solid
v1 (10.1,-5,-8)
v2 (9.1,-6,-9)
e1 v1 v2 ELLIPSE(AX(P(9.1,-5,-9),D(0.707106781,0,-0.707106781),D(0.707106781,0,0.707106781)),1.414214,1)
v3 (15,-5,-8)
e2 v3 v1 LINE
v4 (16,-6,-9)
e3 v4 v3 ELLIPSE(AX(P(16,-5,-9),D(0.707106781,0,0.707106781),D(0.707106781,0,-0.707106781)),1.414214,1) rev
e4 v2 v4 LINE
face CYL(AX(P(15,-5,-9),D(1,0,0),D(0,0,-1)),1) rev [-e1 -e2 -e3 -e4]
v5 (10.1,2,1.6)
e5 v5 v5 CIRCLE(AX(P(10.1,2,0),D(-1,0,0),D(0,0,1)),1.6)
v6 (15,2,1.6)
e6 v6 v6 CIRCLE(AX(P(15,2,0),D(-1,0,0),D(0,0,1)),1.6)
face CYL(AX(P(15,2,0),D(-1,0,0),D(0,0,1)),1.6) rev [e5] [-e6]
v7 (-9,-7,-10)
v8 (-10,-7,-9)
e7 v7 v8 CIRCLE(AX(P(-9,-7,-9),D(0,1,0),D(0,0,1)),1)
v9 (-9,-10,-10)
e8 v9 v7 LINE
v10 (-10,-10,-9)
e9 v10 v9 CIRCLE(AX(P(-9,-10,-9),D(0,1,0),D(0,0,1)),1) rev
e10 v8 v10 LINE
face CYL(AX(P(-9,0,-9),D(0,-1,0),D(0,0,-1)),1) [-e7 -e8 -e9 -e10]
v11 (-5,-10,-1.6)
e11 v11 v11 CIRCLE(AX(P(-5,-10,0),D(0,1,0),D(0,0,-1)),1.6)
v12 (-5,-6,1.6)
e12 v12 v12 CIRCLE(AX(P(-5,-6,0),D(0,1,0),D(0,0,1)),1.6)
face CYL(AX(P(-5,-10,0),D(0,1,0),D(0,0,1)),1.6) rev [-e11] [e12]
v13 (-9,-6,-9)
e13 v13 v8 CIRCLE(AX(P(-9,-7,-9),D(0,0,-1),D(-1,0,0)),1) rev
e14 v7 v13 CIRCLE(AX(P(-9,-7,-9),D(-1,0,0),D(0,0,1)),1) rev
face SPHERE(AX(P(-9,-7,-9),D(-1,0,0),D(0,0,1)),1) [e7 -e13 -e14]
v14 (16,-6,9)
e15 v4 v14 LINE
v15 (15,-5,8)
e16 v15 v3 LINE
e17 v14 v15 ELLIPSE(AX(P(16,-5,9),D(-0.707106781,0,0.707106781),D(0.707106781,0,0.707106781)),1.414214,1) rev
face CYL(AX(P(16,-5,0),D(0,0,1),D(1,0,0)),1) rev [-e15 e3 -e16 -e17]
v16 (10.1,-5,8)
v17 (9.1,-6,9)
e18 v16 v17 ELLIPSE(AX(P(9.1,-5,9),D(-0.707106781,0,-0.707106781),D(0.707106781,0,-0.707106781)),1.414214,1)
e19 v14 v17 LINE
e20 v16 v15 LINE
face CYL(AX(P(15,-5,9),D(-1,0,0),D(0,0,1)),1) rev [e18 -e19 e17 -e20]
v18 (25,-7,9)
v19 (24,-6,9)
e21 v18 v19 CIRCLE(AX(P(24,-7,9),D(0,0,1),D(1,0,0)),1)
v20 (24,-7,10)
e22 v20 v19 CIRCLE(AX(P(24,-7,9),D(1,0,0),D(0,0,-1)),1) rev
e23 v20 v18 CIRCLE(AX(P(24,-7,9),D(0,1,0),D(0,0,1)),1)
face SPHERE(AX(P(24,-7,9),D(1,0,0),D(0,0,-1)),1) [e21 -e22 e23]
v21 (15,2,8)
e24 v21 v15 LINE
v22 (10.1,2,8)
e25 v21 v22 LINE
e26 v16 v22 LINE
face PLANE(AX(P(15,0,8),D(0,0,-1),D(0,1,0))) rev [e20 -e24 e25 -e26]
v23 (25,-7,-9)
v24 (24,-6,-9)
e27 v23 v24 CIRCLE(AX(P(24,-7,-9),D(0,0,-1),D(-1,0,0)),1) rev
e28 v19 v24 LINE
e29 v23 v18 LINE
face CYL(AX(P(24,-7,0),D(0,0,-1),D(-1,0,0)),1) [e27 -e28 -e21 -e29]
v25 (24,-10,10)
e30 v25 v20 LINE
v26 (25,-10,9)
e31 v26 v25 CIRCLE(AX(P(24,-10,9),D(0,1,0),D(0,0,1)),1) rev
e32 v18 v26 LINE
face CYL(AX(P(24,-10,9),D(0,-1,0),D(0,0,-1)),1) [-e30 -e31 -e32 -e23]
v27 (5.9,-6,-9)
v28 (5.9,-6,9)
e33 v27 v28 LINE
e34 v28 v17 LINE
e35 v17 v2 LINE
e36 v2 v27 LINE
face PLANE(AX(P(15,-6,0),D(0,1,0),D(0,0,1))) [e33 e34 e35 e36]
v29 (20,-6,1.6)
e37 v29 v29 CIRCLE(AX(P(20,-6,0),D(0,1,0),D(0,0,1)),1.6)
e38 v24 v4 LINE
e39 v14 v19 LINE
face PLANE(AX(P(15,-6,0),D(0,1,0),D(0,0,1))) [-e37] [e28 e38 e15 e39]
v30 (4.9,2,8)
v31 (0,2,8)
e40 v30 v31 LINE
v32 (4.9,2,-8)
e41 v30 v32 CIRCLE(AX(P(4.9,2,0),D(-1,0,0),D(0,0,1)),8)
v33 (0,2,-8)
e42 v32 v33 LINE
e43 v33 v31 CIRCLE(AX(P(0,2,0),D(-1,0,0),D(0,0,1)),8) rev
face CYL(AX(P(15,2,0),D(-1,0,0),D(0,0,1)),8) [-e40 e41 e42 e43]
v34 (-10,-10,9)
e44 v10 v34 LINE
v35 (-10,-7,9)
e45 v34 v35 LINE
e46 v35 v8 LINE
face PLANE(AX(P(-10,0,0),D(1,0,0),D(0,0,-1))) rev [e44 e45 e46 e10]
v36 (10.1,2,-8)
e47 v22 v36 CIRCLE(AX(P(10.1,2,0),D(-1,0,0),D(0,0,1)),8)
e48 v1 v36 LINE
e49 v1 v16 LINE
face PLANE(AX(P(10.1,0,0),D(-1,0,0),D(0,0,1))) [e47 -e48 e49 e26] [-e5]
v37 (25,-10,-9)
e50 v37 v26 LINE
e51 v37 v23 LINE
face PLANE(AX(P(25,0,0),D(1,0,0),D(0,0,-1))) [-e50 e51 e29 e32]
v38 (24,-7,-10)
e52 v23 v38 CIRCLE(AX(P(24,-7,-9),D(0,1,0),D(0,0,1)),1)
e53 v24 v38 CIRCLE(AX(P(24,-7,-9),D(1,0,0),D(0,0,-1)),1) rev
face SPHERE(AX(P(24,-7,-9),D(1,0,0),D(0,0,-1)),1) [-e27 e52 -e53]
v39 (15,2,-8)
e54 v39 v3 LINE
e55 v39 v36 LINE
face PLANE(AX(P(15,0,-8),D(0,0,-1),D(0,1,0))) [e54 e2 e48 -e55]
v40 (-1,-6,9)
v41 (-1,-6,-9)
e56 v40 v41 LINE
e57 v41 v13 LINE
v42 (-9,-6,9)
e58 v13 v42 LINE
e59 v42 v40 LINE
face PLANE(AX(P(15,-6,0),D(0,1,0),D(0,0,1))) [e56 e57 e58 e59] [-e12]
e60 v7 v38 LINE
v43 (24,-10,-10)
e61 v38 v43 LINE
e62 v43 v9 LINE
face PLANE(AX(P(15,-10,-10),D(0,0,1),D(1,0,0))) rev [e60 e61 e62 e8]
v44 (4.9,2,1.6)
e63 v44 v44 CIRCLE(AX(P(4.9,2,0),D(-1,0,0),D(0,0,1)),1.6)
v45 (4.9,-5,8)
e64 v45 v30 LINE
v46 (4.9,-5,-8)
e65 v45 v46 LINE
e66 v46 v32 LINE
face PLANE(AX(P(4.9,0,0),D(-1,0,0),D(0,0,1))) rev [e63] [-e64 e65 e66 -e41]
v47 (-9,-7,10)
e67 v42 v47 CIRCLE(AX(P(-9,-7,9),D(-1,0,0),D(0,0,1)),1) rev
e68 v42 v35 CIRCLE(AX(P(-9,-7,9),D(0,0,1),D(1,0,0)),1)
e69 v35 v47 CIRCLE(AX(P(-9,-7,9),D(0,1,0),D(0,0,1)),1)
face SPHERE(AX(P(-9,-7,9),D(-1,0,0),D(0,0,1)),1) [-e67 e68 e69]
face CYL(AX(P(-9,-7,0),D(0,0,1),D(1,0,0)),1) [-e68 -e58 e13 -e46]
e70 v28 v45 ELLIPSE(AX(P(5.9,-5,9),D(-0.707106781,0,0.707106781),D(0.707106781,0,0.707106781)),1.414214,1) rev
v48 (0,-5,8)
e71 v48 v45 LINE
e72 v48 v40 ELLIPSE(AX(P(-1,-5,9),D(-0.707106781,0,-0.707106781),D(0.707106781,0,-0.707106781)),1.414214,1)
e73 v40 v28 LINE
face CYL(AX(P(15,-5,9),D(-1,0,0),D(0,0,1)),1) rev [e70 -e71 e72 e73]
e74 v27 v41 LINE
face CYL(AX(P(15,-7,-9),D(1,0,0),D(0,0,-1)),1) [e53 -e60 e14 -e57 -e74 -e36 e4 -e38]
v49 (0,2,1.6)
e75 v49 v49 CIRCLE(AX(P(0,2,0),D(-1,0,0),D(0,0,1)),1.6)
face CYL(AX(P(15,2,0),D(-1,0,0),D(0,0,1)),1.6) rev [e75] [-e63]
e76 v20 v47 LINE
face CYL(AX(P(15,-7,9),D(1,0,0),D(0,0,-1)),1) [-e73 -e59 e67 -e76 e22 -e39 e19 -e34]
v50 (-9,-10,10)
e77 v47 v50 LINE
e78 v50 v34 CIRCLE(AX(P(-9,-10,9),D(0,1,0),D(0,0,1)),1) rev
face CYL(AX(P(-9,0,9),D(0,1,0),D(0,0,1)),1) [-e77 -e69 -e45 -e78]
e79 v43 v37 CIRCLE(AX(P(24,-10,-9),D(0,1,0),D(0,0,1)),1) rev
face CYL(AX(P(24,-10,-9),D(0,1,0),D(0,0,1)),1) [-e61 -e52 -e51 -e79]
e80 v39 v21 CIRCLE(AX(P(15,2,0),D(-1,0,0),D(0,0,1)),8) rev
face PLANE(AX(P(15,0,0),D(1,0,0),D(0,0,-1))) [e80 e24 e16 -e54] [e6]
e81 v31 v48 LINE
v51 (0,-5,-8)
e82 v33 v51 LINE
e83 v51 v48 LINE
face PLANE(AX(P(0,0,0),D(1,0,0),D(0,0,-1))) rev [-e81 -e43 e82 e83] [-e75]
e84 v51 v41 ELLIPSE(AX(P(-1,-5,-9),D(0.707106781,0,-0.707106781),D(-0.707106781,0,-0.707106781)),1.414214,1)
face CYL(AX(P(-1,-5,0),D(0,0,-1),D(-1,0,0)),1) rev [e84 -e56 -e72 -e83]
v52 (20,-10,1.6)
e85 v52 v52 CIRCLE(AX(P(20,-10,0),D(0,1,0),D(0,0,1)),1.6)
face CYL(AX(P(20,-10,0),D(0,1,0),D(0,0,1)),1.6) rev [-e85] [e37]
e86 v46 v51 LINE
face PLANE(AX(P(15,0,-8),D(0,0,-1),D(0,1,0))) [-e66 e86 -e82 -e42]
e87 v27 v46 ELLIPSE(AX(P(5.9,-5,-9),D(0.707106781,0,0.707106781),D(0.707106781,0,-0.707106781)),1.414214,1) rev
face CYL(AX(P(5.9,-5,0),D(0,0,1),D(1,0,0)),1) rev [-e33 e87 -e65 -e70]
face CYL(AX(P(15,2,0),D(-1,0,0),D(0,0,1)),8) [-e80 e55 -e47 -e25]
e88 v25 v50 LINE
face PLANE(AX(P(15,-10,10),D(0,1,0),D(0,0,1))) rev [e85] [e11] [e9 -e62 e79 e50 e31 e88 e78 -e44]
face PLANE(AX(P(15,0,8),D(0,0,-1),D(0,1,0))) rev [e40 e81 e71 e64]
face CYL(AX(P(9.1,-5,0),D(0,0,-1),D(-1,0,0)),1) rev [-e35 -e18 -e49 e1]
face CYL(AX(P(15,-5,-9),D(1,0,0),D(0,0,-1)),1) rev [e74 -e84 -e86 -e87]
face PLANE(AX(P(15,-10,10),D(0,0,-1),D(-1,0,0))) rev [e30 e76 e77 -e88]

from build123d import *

# Parameters (mm, degrees)
SKETCH1_W               = 20
SKETCH1_H               = 20
BOSS_EXTRUDE1_DEPTH     = 15
CUT_EXTRUDE1_DEPTH      = 17.007810594
CUT_EXTRUDE1_DEPTH_BACK = 17.007810594
SKETCH3_W               = 20
SKETCH3_H               = 16
CUT_EXTRUDE2_DEPTH      = 2.6
CUT_EXTRUDE3_DEPTH      = 17.007810594
CUT_EXTRUDE3_DEPTH_BACK = 17.007810594
SKETCH4_R               = 1.6
SKETCH5_W               = 20
SKETCH5_H               = 4
BOSS_EXTRUDE2_DEPTH     = 17.5
CUT_EXTRUDE4_DEPTH      = 32.320919527
CUT_EXTRUDE4_DEPTH_BACK = 32.320919527
SKETCH6_R               = 1.6
FILLET4_R               = 1


with BuildPart() as part:
    # Sketch1 → Boss-Extrude1 (new body)
    with BuildSketch(Plane.YZ):
        Rectangle(SKETCH1_W, SKETCH1_H)
    extrude(amount=BOSS_EXTRUDE1_DEPTH)

    # Sketch2 → Cut-Extrude1 (cut, two sides: drawn at the far end of the back side and taken through both)
    with BuildSketch(Plane.ZY.offset(-7.5).offset(-CUT_EXTRUDE1_DEPTH_BACK)):
        with BuildLine():
            Line((-10, 10), (-10, 0))
            Line((-10, 0), (-10, -6))
            Line((-10, -6), (-8, -6))
            Line((-8, -6), (-8, 2))
            ThreePointArc((-8, 2), (-5.656854249, 7.656854249), (0, 10))
            Line((0, 10), (-10, 10))
        make_face()
        with BuildLine():
            Line((10, 10), (0, 10))
            ThreePointArc((0, 10), (5.656854249, 7.656854249), (8, 2))
            Line((8, 2), (8, -6))
            Line((8, -6), (10, -6))
            Line((10, -6), (10, 0))
            Line((10, 0), (10, 10))
        make_face()
    extrude(amount=CUT_EXTRUDE1_DEPTH + CUT_EXTRUDE1_DEPTH_BACK, mode=Mode.SUBTRACT)

    # Sketch3 → Cut-Extrude2 (cut, symmetric)
    with BuildSketch(Plane.ZY.offset(-7.5)):
        with Locations((0, 2)):
            Rectangle(SKETCH3_W, SKETCH3_H)
    extrude(amount=CUT_EXTRUDE2_DEPTH, both=True, mode=Mode.SUBTRACT)

    # Sketch4 → Cut-Extrude3 (cut, two sides: drawn at the far end of the back side and taken through both)
    with BuildSketch(Plane.ZY.offset(-7.5).offset(-CUT_EXTRUDE3_DEPTH_BACK)):
        with Locations((0, 2)):
            Circle(SKETCH4_R)
    extrude(amount=CUT_EXTRUDE3_DEPTH + CUT_EXTRUDE3_DEPTH_BACK, mode=Mode.SUBTRACT)

    # Sketch5 → Boss-Extrude2 (add, symmetric)
    with BuildSketch(Plane.ZY.offset(-7.5)):
        with Locations((0, -8)):
            Rectangle(SKETCH5_W, SKETCH5_H)
    extrude(amount=BOSS_EXTRUDE2_DEPTH, both=True)

    # Sketch6 → Cut-Extrude4 (cut, two sides: drawn at the far end of the back side and taken through both)
    with BuildSketch(Plane(origin=(0, -6, 0), x_dir=(1, 0, 0), z_dir=(0, 1, 0)).offset(-CUT_EXTRUDE4_DEPTH_BACK)):
        with Locations(Location((20, 0, 0), (0, 0, 270))):
            Circle(SKETCH6_R)
        with Locations(Location((-5, 0, 0), (0, 0, 270))):
            Circle(SKETCH6_R)
    extrude(amount=CUT_EXTRUDE4_DEPTH + CUT_EXTRUDE4_DEPTH_BACK, mode=Mode.SUBTRACT)

    # Fillet4
    fillet4_edges = [part.edges().sort_by_distance(p)[0] for p in [
        (12.55, -6, -8),
        (7.5, -6, -10),
        (7.5, -6, 10),
        (12.55, -6, 8),
        (2.45, -6, 8),
        (2.45, -6, -8),
        (10.1, -6, 0),
        (4.9, -6, 0),
        (0, -6, 0),
        (15, -6, 0),
        (25, -6, 0),
        (25, -8, -10),
        (25, -8, 10),
        (-10, -8, -10),
        (-10, -8, 10),
        (-10, -6, 0),
    ]]
    fillet(fillet4_edges, radius=FILLET4_R - 0.0001)  # a hair under: the kernel refuses the full size


solid = part.part
